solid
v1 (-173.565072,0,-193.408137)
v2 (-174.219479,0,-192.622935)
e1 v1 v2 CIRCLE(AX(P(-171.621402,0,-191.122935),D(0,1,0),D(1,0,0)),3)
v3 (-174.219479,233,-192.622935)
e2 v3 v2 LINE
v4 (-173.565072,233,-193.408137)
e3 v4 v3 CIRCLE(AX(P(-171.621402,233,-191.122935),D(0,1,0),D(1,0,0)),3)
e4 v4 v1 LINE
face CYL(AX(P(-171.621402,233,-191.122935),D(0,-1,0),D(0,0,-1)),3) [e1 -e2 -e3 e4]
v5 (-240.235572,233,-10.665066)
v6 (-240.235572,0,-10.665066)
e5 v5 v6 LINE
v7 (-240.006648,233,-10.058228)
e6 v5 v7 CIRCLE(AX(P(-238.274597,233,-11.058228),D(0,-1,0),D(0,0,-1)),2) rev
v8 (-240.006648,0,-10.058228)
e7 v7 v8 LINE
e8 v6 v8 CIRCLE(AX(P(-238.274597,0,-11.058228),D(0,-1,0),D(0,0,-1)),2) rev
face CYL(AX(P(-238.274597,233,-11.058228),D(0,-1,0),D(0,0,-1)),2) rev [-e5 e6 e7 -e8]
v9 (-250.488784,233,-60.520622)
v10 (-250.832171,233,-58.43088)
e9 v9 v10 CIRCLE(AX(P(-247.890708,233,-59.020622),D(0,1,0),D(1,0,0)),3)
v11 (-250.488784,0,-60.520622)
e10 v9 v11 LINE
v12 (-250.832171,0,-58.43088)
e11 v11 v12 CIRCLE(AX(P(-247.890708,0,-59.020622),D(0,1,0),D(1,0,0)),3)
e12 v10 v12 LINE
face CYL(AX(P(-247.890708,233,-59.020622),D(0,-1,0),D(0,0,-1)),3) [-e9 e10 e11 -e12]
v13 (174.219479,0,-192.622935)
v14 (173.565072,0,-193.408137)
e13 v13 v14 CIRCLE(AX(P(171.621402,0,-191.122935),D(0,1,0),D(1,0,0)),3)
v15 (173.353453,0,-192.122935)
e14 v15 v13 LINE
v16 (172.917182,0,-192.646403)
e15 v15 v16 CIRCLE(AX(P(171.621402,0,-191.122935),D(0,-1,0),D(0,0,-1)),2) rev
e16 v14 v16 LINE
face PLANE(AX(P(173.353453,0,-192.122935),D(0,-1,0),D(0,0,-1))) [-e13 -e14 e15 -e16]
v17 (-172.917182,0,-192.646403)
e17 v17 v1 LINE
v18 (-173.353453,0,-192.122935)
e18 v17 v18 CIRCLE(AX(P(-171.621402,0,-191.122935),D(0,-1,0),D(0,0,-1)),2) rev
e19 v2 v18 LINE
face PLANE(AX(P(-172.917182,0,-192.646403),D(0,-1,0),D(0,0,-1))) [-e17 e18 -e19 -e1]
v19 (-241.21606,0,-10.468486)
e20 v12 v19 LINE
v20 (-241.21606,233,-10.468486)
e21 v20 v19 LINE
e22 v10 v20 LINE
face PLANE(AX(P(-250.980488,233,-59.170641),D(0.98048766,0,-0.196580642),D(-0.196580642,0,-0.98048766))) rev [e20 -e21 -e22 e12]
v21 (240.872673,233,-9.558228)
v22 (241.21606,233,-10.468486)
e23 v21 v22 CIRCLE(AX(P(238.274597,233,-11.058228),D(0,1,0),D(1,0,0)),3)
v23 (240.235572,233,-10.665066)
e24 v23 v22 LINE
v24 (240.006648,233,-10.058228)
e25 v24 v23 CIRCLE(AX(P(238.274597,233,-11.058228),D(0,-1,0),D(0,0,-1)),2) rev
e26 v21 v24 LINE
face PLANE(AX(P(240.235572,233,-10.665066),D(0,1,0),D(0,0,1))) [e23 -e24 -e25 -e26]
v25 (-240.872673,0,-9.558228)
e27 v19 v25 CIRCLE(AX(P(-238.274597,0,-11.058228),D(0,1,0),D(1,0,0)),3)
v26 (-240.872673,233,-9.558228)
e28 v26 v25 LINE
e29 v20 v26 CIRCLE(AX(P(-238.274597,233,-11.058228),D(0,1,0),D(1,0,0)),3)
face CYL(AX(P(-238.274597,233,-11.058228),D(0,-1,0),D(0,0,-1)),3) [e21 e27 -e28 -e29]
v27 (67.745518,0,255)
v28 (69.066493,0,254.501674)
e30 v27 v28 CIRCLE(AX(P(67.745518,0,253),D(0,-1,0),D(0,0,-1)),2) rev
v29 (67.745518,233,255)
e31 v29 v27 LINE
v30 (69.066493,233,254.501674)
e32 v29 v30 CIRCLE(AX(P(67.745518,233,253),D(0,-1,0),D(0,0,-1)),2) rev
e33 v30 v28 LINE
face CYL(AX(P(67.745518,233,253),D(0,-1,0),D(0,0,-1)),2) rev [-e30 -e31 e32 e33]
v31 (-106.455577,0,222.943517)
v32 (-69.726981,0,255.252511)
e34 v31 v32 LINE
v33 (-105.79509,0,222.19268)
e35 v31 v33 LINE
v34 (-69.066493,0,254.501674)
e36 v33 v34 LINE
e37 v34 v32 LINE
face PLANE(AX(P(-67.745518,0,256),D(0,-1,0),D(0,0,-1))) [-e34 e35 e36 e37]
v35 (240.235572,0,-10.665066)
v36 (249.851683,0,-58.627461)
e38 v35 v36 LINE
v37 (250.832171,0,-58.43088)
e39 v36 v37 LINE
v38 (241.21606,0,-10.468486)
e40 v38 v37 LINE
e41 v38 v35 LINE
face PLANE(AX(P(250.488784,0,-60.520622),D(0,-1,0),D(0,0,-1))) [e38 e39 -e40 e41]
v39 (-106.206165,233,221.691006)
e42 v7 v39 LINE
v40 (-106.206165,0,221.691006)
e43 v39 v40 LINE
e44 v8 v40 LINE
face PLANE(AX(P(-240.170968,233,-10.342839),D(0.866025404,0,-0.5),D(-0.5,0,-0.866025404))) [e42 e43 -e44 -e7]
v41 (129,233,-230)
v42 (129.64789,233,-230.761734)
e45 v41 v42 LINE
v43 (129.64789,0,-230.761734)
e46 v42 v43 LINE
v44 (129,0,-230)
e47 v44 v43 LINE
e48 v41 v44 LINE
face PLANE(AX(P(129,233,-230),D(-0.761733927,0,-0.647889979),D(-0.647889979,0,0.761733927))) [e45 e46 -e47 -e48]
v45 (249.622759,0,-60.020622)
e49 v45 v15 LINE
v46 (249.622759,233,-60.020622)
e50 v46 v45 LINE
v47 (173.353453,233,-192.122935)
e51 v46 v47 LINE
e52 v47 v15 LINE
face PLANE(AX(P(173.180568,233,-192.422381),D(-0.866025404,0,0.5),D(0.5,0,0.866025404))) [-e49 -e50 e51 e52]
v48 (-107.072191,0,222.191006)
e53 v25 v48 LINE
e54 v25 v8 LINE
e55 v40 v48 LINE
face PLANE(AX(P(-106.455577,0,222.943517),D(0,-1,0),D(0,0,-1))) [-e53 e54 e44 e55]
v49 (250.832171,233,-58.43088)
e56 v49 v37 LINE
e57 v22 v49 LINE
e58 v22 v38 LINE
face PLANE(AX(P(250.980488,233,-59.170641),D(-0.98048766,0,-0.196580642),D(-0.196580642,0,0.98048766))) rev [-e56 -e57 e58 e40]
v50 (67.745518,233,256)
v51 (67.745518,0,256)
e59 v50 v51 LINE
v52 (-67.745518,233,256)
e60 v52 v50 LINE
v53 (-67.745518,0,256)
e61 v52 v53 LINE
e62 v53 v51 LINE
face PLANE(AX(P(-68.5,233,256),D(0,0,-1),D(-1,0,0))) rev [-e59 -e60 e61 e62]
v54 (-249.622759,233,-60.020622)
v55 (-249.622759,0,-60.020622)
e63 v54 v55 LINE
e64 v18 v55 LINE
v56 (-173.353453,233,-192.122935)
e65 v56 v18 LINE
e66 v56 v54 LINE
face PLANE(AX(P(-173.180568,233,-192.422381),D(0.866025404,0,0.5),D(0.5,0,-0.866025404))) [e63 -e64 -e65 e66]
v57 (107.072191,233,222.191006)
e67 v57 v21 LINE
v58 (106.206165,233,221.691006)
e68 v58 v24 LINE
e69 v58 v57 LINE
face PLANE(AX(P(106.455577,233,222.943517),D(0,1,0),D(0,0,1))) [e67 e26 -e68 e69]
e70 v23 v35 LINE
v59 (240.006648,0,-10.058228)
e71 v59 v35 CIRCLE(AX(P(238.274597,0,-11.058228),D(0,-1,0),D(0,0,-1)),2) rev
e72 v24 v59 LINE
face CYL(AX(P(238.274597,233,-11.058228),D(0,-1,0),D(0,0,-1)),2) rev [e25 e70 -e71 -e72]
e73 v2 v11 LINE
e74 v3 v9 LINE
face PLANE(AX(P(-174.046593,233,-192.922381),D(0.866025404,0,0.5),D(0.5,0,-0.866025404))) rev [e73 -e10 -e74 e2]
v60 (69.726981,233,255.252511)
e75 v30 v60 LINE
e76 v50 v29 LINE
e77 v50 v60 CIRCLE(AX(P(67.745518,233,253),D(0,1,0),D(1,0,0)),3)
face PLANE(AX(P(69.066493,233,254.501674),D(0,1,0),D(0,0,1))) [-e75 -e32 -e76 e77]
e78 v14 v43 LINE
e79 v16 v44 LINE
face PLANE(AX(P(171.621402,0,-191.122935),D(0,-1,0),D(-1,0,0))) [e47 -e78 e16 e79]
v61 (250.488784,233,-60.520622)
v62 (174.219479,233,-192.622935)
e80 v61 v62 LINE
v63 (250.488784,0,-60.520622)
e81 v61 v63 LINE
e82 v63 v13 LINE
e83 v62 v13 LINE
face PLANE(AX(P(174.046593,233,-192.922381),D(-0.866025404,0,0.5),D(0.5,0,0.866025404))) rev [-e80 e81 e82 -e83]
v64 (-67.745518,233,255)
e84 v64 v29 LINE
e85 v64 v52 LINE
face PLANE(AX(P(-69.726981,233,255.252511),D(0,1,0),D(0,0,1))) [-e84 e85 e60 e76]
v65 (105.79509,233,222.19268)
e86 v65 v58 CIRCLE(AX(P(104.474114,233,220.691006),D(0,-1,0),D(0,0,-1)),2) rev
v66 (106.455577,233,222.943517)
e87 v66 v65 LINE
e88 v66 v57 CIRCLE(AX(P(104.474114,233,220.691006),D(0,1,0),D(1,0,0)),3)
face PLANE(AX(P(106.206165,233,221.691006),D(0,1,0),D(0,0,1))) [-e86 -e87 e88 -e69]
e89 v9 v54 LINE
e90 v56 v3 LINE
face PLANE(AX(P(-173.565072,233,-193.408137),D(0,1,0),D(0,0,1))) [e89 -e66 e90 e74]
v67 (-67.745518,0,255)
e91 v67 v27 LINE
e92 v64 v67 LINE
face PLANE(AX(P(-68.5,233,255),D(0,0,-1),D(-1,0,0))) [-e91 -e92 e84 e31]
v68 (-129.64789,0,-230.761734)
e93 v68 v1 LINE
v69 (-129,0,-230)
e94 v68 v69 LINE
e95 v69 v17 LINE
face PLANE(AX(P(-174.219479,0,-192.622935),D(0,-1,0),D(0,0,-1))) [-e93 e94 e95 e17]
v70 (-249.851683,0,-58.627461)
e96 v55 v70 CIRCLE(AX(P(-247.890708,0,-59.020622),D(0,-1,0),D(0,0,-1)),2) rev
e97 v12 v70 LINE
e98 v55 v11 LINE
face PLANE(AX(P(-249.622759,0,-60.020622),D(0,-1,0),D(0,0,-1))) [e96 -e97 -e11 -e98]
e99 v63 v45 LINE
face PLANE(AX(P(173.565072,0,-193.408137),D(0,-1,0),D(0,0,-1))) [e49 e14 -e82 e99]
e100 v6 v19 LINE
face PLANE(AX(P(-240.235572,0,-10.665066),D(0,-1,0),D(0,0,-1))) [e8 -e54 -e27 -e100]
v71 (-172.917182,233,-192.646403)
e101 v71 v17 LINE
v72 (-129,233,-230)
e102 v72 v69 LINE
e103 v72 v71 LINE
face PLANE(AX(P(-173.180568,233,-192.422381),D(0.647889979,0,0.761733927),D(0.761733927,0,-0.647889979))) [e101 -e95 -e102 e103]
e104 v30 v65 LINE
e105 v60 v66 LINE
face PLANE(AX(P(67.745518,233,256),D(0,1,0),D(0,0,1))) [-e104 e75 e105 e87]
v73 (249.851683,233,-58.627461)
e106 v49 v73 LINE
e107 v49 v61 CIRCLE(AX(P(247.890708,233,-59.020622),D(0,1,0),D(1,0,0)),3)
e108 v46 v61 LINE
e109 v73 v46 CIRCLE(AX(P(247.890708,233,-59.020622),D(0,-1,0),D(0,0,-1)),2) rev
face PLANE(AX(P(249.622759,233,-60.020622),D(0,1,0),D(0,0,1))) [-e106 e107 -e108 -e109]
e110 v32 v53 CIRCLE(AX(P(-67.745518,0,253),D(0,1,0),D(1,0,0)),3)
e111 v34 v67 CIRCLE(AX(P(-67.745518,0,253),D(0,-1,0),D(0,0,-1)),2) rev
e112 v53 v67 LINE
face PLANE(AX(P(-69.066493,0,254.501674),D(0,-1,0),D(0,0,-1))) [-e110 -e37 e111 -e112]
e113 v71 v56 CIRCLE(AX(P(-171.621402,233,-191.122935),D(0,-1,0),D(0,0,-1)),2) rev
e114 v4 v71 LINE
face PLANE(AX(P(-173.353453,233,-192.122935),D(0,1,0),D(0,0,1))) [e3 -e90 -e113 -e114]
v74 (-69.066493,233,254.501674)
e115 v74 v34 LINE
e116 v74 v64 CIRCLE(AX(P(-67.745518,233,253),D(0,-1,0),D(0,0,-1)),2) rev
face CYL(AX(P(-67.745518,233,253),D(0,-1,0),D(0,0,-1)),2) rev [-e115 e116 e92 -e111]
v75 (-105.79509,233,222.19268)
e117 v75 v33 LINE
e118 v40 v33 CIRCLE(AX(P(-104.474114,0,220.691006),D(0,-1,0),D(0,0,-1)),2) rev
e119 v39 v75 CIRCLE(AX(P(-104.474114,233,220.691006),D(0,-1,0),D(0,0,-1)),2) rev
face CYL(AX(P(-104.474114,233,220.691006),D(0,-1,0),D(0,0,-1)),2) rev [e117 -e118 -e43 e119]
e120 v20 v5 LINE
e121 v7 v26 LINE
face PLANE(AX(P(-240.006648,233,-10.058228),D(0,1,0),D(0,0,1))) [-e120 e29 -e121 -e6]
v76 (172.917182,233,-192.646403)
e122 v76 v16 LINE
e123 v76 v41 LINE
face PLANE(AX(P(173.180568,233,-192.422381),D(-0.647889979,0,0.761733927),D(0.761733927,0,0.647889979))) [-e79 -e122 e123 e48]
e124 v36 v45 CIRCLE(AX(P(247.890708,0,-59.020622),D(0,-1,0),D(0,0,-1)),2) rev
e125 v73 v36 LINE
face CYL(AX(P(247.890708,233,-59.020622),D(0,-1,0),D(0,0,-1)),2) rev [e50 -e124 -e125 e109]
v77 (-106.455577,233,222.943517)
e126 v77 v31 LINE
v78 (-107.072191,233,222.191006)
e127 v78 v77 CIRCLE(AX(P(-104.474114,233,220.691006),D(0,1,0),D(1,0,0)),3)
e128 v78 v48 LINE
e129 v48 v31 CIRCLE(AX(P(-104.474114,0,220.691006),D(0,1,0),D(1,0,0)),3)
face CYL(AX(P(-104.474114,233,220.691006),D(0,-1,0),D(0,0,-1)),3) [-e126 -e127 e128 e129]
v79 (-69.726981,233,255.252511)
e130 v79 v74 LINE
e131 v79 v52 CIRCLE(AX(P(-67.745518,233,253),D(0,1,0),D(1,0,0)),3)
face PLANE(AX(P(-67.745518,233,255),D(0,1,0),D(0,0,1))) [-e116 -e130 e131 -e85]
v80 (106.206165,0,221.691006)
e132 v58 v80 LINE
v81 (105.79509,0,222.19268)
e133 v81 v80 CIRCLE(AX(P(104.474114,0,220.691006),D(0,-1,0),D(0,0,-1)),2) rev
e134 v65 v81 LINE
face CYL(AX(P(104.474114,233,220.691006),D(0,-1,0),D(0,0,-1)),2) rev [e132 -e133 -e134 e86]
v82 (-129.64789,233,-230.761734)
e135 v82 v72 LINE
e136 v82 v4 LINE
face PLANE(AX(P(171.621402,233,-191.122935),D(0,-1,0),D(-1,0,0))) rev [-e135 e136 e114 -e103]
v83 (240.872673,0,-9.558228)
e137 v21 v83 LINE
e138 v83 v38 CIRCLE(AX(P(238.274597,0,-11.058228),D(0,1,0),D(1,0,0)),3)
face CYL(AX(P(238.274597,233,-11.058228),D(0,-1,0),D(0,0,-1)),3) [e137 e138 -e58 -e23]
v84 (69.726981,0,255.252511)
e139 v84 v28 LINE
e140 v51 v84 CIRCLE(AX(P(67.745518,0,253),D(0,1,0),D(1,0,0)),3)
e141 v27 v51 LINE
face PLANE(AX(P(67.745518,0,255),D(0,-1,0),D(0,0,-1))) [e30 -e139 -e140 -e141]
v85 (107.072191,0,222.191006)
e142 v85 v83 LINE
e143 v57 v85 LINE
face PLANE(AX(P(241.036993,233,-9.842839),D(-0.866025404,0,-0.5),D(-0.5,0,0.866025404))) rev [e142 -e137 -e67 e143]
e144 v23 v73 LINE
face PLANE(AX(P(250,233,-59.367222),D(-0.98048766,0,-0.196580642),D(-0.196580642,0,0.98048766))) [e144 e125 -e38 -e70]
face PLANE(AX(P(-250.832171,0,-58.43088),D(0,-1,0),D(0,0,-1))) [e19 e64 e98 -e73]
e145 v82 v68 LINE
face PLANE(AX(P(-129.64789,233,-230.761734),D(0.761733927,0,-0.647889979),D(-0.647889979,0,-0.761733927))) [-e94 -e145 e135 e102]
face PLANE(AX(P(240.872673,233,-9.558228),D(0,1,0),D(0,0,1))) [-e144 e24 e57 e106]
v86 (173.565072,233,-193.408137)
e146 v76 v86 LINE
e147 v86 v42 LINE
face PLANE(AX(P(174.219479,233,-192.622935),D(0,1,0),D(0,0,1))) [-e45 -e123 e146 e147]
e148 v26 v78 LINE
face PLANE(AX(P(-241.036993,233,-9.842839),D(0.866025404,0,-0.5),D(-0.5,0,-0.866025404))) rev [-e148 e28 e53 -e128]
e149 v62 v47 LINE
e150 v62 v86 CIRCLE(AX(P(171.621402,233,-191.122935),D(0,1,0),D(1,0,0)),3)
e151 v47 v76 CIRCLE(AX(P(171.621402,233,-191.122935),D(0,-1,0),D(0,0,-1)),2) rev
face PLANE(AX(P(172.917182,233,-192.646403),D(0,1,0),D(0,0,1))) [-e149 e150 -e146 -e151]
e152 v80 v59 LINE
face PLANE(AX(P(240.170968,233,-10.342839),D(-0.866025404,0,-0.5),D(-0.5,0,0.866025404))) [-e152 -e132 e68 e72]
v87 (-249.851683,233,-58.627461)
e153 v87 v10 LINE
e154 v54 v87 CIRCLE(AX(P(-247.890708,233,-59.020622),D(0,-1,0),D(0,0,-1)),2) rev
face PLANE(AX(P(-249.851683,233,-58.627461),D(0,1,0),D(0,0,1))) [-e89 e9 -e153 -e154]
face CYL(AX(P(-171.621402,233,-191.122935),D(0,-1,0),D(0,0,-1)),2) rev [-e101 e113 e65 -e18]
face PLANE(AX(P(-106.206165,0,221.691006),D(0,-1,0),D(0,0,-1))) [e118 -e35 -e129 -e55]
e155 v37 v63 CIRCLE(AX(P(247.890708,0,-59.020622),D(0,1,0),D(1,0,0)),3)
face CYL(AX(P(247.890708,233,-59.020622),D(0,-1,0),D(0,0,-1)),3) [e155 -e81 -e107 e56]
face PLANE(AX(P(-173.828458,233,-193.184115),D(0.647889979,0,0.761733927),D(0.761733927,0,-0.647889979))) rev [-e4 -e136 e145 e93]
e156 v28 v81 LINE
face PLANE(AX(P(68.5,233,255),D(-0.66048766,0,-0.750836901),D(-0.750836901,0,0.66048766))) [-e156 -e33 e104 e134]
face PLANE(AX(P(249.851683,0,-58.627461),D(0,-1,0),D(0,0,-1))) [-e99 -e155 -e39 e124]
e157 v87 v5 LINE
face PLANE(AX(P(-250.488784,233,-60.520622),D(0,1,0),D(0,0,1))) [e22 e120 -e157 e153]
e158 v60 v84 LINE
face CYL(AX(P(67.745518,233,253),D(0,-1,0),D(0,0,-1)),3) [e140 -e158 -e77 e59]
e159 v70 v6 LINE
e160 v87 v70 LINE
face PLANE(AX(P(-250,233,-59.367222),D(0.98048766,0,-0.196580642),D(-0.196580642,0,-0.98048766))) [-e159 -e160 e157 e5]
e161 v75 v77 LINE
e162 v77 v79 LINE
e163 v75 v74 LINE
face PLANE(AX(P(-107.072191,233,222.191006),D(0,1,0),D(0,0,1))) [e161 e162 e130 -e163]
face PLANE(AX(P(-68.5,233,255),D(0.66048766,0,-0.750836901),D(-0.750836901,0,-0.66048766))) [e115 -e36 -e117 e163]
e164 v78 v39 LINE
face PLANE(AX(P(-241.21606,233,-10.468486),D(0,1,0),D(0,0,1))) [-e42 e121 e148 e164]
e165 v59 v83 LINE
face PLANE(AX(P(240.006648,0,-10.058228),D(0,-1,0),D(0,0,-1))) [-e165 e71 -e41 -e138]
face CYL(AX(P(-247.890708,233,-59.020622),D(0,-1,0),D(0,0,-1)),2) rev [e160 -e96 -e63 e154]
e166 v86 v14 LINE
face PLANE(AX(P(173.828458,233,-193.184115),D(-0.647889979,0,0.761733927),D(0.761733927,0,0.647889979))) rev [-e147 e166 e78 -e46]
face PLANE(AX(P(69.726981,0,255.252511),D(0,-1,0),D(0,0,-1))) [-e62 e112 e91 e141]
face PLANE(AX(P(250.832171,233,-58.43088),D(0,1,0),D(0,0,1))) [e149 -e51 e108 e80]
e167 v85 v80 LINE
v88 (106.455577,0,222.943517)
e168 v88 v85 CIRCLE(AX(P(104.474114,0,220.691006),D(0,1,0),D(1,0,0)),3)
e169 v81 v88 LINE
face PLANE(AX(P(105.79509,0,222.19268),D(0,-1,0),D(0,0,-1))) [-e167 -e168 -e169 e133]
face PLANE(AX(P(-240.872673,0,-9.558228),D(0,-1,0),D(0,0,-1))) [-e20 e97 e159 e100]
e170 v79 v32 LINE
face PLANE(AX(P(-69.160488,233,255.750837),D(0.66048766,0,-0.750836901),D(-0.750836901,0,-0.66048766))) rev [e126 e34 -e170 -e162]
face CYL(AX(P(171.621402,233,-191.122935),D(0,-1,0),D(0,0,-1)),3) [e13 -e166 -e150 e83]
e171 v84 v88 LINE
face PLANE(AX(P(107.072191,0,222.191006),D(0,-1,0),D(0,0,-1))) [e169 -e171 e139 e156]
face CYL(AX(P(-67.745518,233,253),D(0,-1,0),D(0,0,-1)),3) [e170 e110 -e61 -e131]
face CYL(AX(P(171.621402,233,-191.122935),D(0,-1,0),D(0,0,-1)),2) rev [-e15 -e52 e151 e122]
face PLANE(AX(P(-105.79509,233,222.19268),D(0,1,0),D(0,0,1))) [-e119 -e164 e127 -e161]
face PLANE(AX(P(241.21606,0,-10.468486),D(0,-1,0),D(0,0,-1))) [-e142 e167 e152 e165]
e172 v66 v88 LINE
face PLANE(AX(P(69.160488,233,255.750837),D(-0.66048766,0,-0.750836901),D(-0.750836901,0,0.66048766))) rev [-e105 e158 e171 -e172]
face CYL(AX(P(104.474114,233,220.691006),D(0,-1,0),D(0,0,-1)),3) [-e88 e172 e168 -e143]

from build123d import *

# Parameters (mm, degrees)
SM_BASE_FLANGE_1_DEPTH = 233


# Sheet-metal steps are written as plain solids
with BuildPart() as part:
    # 草图1 → 基体-法兰1 (new body)
    with BuildSketch(Plane(origin=(0, 0, 0), x_dir=(1, 0, 0), z_dir=(0, 1, 0))):
        with BuildLine():
            Line((-129, 230), (-172.917182347, 192.646402715))
            ThreePointArc((-172.917182347, 192.646402715), (-173.157776183, 192.403386175), (-173.353453197, 192.122934861))
            Line((-173.353453197, 192.122934861), (-249.622758888, 60.020622347))
            ThreePointArc((-249.622758888, 60.020622347), (-249.864241735, 59.344913751), (-249.8516834, 58.627461063))
            Line((-249.8516834, 58.627461063), (-240.235572229, 10.665066397))
            ThreePointArc((-240.235572229, 10.665066397), (-240.145872891, 10.352305448), (-240.006647716, 10.058227681))
            Line((-240.006647716, 10.058227681), (-106.206165205, -221.691006107))
            ThreePointArc((-106.206165205, -221.691006107), (-106.021098975, -221.958617528), (-105.795089717, -222.192679908))
            Line((-105.795089717, -222.192679908), (-69.066493095, -254.501673801))
            ThreePointArc((-69.066493095, -254.501673801), (-68.451440008, -254.871275982), (-67.745517775, -255))
            Line((-67.745517775, -255), (67.745517775, -255))
            ThreePointArc((67.745517775, -255), (68.451440008, -254.871275982), (69.066493095, -254.501673801))
            Line((69.066493095, -254.501673801), (105.795089717, -222.192679908))
            ThreePointArc((105.795089717, -222.192679908), (106.021098975, -221.958617528), (106.206165205, -221.691006107))
            Line((106.206165205, -221.691006107), (240.006647716, 10.058227681))
            ThreePointArc((240.006647716, 10.058227681), (240.145872891, 10.352305448), (240.235572229, 10.665066397))
            Line((240.235572229, 10.665066397), (249.8516834, 58.627461063))
            ThreePointArc((249.8516834, 58.627461063), (249.864241735, 59.344913751), (249.622758888, 60.020622347))
            Line((249.622758888, 60.020622347), (173.353453197, 192.122934861))
            ThreePointArc((173.353453197, 192.122934861), (173.157776183, 192.403386175), (172.917182347, 192.646402715))
            Line((172.917182347, 192.646402715), (129, 230))
            Line((129, 230), (129.647889979, 230.761733927))
            Line((129.647889979, 230.761733927), (173.565072326, 193.408136642))
            ThreePointArc((173.565072326, 193.408136642), (173.92596308, 193.043611831), (174.219478601, 192.622934861))
            Line((174.219478601, 192.622934861), (250.488784291, 60.520622347))
            ThreePointArc((250.488784291, 60.520622347), (250.851008562, 59.507059453), (250.83217106, 58.430880421))
            Line((250.83217106, 58.430880421), (241.216059889, 10.468485755))
            ThreePointArc((241.216059889, 10.468485755), (241.081510882, 9.999344331), (240.87267312, 9.558227681))
            Line((240.87267312, 9.558227681), (107.072190608, -222.191006107))
            ThreePointArc((107.072190608, -222.191006107), (106.794591264, -222.592423239), (106.455577377, -222.943516809))
            Line((106.455577377, -222.943516809), (69.726980755, -255.252510702))
            ThreePointArc((69.726980755, -255.252510702), (68.804401125, -255.806913973), (67.745517775, -256))
            Line((67.745517775, -256), (-67.745517775, -256))
            ThreePointArc((-67.745517775, -256), (-68.804401125, -255.806913973), (-69.726980755, -255.252510702))
            Line((-69.726980755, -255.252510702), (-106.455577377, -222.943516809))
            ThreePointArc((-106.455577377, -222.943516809), (-106.794591264, -222.592423239), (-107.072190608, -222.191006107))
            Line((-107.072190608, -222.191006107), (-240.87267312, 9.558227681))
            ThreePointArc((-240.87267312, 9.558227681), (-241.081510882, 9.999344331), (-241.216059889, 10.468485754))
            Line((-241.216059889, 10.468485755), (-250.83217106, 58.430880421))
            ThreePointArc((-250.83217106, 58.430880421), (-250.851008562, 59.507059453), (-250.488784291, 60.520622347))
            Line((-250.488784291, 60.520622347), (-174.219478601, 192.622934861))
            ThreePointArc((-174.219478601, 192.622934861), (-173.92596308, 193.043611831), (-173.565072326, 193.408136642))
            Line((-173.565072326, 193.408136642), (-129.647889979, 230.761733927))
            Line((-129.647889979, 230.761733927), (-129, 230))
        make_face()
    extrude(amount=SM_BASE_FLANGE_1_DEPTH)


solid = part.part
